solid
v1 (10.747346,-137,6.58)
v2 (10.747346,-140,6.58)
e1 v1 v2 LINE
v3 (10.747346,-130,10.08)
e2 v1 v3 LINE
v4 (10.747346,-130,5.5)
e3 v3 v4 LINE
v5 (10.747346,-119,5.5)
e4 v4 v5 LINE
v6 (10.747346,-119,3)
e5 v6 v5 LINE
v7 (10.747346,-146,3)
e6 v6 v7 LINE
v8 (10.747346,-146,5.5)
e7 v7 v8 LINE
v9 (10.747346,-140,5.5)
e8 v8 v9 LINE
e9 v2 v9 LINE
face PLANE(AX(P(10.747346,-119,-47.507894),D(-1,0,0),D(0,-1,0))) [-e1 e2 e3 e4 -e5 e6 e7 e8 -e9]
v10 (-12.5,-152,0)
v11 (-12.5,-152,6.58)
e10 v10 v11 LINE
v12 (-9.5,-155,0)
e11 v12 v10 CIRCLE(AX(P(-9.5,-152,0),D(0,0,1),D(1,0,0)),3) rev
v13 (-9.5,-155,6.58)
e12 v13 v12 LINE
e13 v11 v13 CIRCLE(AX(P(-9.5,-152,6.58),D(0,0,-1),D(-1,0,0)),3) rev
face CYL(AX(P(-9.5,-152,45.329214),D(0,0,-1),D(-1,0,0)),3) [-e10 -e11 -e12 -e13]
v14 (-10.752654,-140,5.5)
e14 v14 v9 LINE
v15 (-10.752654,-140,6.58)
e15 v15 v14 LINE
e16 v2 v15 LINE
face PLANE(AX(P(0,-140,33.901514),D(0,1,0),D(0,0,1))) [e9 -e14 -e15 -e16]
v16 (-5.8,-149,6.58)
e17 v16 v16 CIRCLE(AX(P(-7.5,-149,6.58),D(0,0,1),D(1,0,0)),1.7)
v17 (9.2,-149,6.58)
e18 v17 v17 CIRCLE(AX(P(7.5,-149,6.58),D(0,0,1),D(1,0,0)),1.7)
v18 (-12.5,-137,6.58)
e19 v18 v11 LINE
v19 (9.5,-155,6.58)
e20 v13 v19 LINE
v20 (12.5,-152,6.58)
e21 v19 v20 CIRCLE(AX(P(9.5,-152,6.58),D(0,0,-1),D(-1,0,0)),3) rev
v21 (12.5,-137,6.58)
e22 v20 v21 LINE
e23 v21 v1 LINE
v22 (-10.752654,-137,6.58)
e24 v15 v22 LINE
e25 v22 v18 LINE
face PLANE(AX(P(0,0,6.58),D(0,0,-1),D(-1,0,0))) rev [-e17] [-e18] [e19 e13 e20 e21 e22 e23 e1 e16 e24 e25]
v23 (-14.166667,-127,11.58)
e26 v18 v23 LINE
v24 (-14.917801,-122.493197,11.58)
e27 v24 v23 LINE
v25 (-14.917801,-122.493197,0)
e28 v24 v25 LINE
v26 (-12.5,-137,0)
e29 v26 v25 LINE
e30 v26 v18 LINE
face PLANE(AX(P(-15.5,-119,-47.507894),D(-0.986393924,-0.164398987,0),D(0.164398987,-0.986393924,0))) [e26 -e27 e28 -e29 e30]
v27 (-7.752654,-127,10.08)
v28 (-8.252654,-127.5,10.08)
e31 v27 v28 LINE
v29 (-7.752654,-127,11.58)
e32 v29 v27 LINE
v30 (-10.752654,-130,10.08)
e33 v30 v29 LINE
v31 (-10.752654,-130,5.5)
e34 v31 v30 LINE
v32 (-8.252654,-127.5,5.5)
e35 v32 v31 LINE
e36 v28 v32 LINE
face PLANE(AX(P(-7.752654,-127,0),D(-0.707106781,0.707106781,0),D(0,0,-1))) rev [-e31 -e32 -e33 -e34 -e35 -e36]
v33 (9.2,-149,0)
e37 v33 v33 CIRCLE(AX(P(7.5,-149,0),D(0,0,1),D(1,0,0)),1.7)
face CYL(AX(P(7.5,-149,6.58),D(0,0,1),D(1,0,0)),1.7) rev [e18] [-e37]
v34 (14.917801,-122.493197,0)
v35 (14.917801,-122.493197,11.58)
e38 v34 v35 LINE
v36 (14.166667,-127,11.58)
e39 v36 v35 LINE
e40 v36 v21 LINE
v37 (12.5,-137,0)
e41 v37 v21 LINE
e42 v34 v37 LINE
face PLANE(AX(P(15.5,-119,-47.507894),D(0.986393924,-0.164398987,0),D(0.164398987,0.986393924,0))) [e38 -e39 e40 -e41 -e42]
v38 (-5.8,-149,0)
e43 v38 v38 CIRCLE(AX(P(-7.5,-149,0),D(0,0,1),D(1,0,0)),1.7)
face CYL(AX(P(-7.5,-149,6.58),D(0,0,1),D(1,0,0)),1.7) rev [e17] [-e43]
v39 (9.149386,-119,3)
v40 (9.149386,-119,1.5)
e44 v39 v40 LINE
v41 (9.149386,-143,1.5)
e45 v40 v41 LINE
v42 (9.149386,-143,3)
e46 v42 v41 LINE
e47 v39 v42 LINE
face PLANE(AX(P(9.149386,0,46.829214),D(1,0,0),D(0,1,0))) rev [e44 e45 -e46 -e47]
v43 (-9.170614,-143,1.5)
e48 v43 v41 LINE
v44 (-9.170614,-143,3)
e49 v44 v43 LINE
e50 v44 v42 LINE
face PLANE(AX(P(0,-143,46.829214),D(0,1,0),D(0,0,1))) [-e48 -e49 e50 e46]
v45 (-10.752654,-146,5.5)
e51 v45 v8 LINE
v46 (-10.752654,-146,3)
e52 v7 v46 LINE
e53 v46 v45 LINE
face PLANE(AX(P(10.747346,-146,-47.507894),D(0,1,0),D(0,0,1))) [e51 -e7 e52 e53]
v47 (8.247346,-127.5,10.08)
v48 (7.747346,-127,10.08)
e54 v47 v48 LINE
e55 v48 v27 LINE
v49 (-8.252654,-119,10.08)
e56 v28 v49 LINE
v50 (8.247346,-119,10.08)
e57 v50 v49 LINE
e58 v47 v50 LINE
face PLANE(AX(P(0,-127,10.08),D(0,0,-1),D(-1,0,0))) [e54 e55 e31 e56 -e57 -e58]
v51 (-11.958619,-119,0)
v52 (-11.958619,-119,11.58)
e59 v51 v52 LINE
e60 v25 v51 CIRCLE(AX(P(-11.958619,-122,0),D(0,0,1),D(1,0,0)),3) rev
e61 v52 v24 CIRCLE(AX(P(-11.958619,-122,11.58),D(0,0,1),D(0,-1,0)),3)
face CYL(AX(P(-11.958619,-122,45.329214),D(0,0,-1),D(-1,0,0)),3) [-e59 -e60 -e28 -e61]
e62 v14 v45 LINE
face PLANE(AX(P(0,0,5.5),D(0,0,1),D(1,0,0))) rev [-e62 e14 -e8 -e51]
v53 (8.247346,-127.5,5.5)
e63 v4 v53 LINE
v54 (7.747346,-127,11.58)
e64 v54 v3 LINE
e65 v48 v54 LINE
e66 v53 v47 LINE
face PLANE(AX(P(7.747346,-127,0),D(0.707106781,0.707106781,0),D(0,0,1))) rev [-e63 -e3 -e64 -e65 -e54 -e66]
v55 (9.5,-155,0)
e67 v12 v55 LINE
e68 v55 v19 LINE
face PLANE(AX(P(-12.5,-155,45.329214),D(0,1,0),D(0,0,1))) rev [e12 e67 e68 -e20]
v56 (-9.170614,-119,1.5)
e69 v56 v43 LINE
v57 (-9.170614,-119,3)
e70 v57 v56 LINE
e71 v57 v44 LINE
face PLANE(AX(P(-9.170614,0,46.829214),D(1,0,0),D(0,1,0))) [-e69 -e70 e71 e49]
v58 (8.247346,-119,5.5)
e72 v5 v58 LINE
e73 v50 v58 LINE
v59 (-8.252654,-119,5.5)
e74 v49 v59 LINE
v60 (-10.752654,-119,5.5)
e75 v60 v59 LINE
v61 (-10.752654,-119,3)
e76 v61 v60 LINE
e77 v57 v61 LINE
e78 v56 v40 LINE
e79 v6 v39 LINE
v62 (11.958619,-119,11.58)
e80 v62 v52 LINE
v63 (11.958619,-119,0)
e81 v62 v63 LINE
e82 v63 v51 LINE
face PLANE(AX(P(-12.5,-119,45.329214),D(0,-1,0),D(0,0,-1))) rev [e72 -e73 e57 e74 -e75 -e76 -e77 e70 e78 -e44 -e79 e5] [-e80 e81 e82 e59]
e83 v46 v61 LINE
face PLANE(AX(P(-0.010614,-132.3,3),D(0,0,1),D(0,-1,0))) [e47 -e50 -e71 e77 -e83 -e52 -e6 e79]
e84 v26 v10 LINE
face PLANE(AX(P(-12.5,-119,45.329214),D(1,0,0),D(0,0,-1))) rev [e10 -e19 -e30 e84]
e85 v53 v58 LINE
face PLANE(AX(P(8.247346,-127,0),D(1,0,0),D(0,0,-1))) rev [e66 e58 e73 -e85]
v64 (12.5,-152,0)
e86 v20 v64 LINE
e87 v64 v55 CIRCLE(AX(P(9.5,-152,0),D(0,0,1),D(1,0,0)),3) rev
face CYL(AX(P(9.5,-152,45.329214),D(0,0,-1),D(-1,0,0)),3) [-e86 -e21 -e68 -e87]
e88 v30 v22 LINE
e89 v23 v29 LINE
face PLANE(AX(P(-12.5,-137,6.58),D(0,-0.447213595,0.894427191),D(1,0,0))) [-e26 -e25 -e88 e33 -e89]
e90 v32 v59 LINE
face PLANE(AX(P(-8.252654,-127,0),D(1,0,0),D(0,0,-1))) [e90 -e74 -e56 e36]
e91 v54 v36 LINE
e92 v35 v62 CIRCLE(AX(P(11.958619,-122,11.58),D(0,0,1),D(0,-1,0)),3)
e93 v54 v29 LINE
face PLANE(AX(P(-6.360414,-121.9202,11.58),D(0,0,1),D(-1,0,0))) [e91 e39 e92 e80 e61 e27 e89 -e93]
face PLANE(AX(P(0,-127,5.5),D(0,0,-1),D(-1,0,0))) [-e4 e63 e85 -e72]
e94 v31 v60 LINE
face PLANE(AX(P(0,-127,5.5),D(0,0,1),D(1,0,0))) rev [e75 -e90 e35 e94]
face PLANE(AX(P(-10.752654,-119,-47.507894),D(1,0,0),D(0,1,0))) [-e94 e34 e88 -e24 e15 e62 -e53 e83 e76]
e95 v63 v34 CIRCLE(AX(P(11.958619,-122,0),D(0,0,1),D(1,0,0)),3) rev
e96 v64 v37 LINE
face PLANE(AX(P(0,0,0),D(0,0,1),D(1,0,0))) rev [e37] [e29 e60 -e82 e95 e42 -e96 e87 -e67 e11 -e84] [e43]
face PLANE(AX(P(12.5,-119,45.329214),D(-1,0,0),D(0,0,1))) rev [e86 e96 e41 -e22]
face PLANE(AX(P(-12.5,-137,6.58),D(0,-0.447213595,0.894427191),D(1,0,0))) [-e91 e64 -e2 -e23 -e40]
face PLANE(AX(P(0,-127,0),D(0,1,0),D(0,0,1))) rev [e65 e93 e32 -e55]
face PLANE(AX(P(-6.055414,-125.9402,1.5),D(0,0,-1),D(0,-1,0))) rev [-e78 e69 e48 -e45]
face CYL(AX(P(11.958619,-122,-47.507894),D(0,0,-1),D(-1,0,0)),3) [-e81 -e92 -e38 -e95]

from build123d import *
from OCP.BRepFilletAPI import BRepFilletAPI_MakeChamfer

# Parameters (mm, degrees)
ESQUISSE2_W             = 25
ESQUISSE2_H             = 36
BOSS_EXTRU_1_DEPTH      = 1.5
ESQUISSE3_W             = 3.350614404
ESQUISSE3_H             = 24
ESQUISSE3_W_2           = 3.329385596
BOSS_EXTRU_2_DEPTH      = 1.5
BOSS_EXTRU_3_DEPTH      = 8.58
BOSS_EXTRU_3_DEPTH_BACK = 3
BOSS_EXTRU_4_START      = 2.5
ESQUISSE5_W             = 18.32
ESQUISSE5_H             = 3
BOSS_EXTRU_4_DEPTH      = 6.08
ESQUISSE6_W             = 16.5
ESQUISSE6_H             = 1.5
BOSS_EXTRU_5_DEPTH      = 8
ESQUISSE7_W             = 25
ESQUISSE7_H             = 18
ENL_V_MAT_EXTRU_1_DEPTH = 5
CHANFREIN1_SIZE         = 10
CHANFREIN1_SIZE_2       = 5
CHANFREIN3_SIZE         = 3
CONG_1_R                = 3
CONG_2_R                = 3
D_GAGEMENT_M31_D        = 3.4


# Some blends are built 0.0001 mm under size
with BuildPart() as part:
    # Esquisse2 → Boss.-Extru.1 (new body)
    with BuildSketch(Plane.XY):
        with Locations((0, -137)):
            Rectangle(ESQUISSE2_W, ESQUISSE2_H)
    extrude(amount=BOSS_EXTRU_1_DEPTH)

    # Esquisse3 → Boss.-Extru.2 (add)
    with BuildSketch(Plane.XY.offset(1.5)):
        with Locations((10.824692798, -131)):
            Rectangle(ESQUISSE3_W, ESQUISSE3_H)
        Polygon((-12.5, -143), (-12.5, -155), (12.5, -155), (12.5, -143), (9.149385596, -143), (-9.170614404, -143), align=None)
        with Locations((-10.835307202, -131)):
            Rectangle(ESQUISSE3_W_2, ESQUISSE3_H)
    extrude(amount=BOSS_EXTRU_2_DEPTH)

    # Esquisse4 → Boss.-Extru.3 (add, two sides: drawn at the far end of the back side and taken through both)
    with BuildSketch(Plane.XY.offset(3).offset(-BOSS_EXTRU_3_DEPTH_BACK)):
        Polygon((-12.5, -119), (-15.5, -119), (-12.5, -137), (-12.5, -155), (12.5, -155), (12.5, -137), (15.5, -119), (12.5, -119), (10.747346399, -119), (10.747346399, -146), (-10.752653601, -146), (-10.752653601, -119), align=None)
    extrude(amount=BOSS_EXTRU_3_DEPTH + BOSS_EXTRU_3_DEPTH_BACK)

    # Esquisse5 → Boss.-Extru.4 (add)
    with BuildSketch(Plane.XY.offset(3).offset(BOSS_EXTRU_4_START)):
        Polygon((-10.752653601, -140), (-10.752653601, -146), (10.747346399, -146), (10.747346399, -140), (9.149385596, -140), (9.149385596, -143), (-9.170614404, -143), (-9.170614404, -140), align=None)
        with Locations((-0.010614404, -141.5)):
            Rectangle(ESQUISSE5_W, ESQUISSE5_H)
    extrude(amount=BOSS_EXTRU_4_DEPTH)

    # Esquisse6 → Boss.-Extru.5 (add)
    with BuildSketch(Plane(origin=(0, -119, 0), x_dir=(1, 0, 0), z_dir=(0, 1, 0))):
        Polygon((8.247346399, -11.58), (10.747346399, -11.58), (10.747346399, -5.5), (8.247346399, -5.5), (8.247346399, -10.08), align=None)
        with Locations((-0.002653601, -10.83)):
            Rectangle(ESQUISSE6_W, ESQUISSE6_H)
        Polygon((-10.752653601, -11.58), (-8.252653601, -11.58), (-8.252653601, -10.08), (-8.252653601, -5.5), (-10.752653601, -5.5), align=None)
    extrude(amount=-BOSS_EXTRU_5_DEPTH)

    # Esquisse7 → Enlèv. mat.-Extru.1 (cut)
    with BuildSketch(Plane.XY.offset(11.58)):
        with Locations((0, -146)):
            Rectangle(ESQUISSE7_W, ESQUISSE7_H)
    extrude(amount=-ENL_V_MAT_EXTRU_1_DEPTH, mode=Mode.SUBTRACT)

    # Chanfrein1
    chanfrein1_edges_1 = [part.edges().sort_by_distance(p)[0] for p in [
        (11.6236732, -137, 11.58),
    ]]
    chanfrein1_side_1 = [part.faces().sort_by_distance(p)[0] for p in [
        (11.6236732, -136.9, 11.58),
    ]]
    chanfrein1_edges_2 = [part.edges().sort_by_distance(p)[0] for p in [
        (-11.6263268, -137, 11.58),
    ]]
    chanfrein1_side_2 = [part.faces().sort_by_distance(p)[0] for p in [
        (-11.6263268, -136.9, 11.58),
    ]]
    chanfrein1 = BRepFilletAPI_MakeChamfer(part.part.solid().wrapped)
    for e in chanfrein1_edges_1:
        chanfrein1.Add(CHANFREIN1_SIZE - 0.0001, CHANFREIN1_SIZE_2 - 0.0001, e.wrapped, chanfrein1_side_1[0].wrapped)
    for e in chanfrein1_edges_2:
        chanfrein1.Add(CHANFREIN1_SIZE - 0.0001, CHANFREIN1_SIZE_2 - 0.0001, e.wrapped, chanfrein1_side_2[0].wrapped)
    add(Compound.cast(chanfrein1.Shape()), mode=Mode.REPLACE)  # a hair under: the kernel refuses the full size

    # Chanfrein3
    # the kernel refuses this chamfer: 3 mm, written as the material it adds along each edge
    with BuildSketch(Plane(origin=(-10.752653601, -127, 5.5), x_dir=(0.9996219169112968, 0.027495876610586775, 0), z_dir=(0, 0, 1))) as chanfrein3_piece_1_section:
        Polygon((CHANFREIN3_SIZE * 0.999621916911, -CHANFREIN3_SIZE * 0.0274958766106), (-CHANFREIN3_SIZE * 0.0274958766106, -CHANFREIN3_SIZE * 0.999621916911), (0, 0), align=None)
    chanfrein3_piece_1 = extrude(amount=6.08, mode=Mode.PRIVATE)
    chanfrein3_piece_1 = split(chanfrein3_piece_1, bisect_by=Plane(origin=(-8.784858651, -128.928894575, 10.615612357), z_dir=(0, 0.4472100177446834, -0.8944289798686087)), keep=Keep.TOP, mode=Mode.PRIVATE)
    chanfrein3_piece_1 = split(chanfrein3_piece_1, bisect_by=Plane(origin=(-8.252653601, -127.516102525, 7.79), z_dir=(-1, 0, 0)), keep=Keep.TOP, mode=Mode.PRIVATE)
    add(chanfrein3_piece_1)
    with BuildSketch(Plane(origin=(-10.752653601, -127, -2.215048964), x_dir=(0.9996219169112968, 0.027495876610586775, 0), z_dir=(0, 0, 1))) as chanfrein3_piece_2_section:
        Polygon((CHANFREIN3_SIZE * 0.999621916911, -CHANFREIN3_SIZE * 0.0274958766106), (-CHANFREIN3_SIZE * 0.0274958766106, -CHANFREIN3_SIZE * 0.999621916911), (0, 0), align=None)
    chanfrein3_piece_2 = extrude(amount=13.795048964, mode=Mode.PRIVATE)
    chanfrein3_piece_2 = split(chanfrein3_piece_2, bisect_by=Plane(origin=(-8.083536067, -127.445596899, 11.357253778), z_dir=(0, 0.4472100177446834, -0.8944289798686087)), keep=Keep.TOP, mode=Mode.PRIVATE)
    chanfrein3_piece_2 = split(chanfrein3_piece_2, bisect_by=Plane(origin=(-8.083536067, -127.161764932, 10.08), z_dir=(0, 0, 1)), keep=Keep.TOP, mode=Mode.PRIVATE)
    add(chanfrein3_piece_2)
    with BuildSketch(Plane(origin=(10.747346399, -127, 11.58), x_dir=(0.027495876610588044, -0.9996219169112968, 0), z_dir=(0, 0, -1))) as chanfrein3_piece_3_section:
        Polygon((CHANFREIN3_SIZE * 0.999621916911, CHANFREIN3_SIZE * 0.0274958766106), (-CHANFREIN3_SIZE * 0.0274958766106, CHANFREIN3_SIZE * 0.999621916911), (0, 0), align=None)
    chanfrein3_piece_3 = extrude(amount=6.08, mode=Mode.PRIVATE)
    chanfrein3_piece_3 = split(chanfrein3_piece_3, bisect_by=Plane(origin=(9.990097255, -128.087123339, 11.036493766), z_dir=(0, 0.4472100177446834, -0.8944289798686087)), keep=Keep.TOP, mode=Mode.PRIVATE)
    chanfrein3_piece_3 = split(chanfrein3_piece_3, bisect_by=Plane(origin=(8.247346399, -127.874570821, 10.61138448), z_dir=(1, 0, 0)), keep=Keep.TOP, mode=Mode.PRIVATE)
    add(chanfrein3_piece_3)
    with BuildSketch(Plane(origin=(10.747346399, -127, 11.58), x_dir=(0.027495876610588044, -0.9996219169112968, 0), z_dir=(0, 0, -1))) as chanfrein3_piece_4_section:
        Polygon((CHANFREIN3_SIZE * 0.999621916911, CHANFREIN3_SIZE * 0.0274958766106), (-CHANFREIN3_SIZE * 0.0274958766106, CHANFREIN3_SIZE * 0.999621916911), (0, 0), align=None)
    chanfrein3_piece_4 = extrude(amount=13.795048964, mode=Mode.PRIVATE)
    chanfrein3_piece_4 = split(chanfrein3_piece_4, bisect_by=Plane(origin=(8.078228865, -127.445596899, 11.357253778), z_dir=(0, 0.4472100177446834, -0.8944289798686087)), keep=Keep.TOP, mode=Mode.PRIVATE)
    chanfrein3_piece_4 = split(chanfrein3_piece_4, bisect_by=Plane(origin=(8.078228865, -127.161764932, 10.08), z_dir=(0, 0, 1)), keep=Keep.TOP, mode=Mode.PRIVATE)
    add(chanfrein3_piece_4)

    # Congé1
    cong_1_edges = [part.edges().sort_by_distance(p)[0] for p in [
        (-15.5, -119, 5.79),
        (15.5, -119, 5.79),
    ]]
    fillet(cong_1_edges, radius=CONG_1_R)

    # Congé2
    cong_2_edges = [part.edges().sort_by_distance(p)[0] for p in [
        (12.5, -155, 3.29),
        (-12.5, -155, 3.29),
    ]]
    fillet(cong_2_edges, radius=CONG_2_R)

    # Dégagement M31 (through all)
    with Locations(Plane.XY.offset(6.58)):
        with Locations((7.5, -149), (-7.5, -149)):
            Hole(D_GAGEMENT_M31_D / 2)


solid = part.part
